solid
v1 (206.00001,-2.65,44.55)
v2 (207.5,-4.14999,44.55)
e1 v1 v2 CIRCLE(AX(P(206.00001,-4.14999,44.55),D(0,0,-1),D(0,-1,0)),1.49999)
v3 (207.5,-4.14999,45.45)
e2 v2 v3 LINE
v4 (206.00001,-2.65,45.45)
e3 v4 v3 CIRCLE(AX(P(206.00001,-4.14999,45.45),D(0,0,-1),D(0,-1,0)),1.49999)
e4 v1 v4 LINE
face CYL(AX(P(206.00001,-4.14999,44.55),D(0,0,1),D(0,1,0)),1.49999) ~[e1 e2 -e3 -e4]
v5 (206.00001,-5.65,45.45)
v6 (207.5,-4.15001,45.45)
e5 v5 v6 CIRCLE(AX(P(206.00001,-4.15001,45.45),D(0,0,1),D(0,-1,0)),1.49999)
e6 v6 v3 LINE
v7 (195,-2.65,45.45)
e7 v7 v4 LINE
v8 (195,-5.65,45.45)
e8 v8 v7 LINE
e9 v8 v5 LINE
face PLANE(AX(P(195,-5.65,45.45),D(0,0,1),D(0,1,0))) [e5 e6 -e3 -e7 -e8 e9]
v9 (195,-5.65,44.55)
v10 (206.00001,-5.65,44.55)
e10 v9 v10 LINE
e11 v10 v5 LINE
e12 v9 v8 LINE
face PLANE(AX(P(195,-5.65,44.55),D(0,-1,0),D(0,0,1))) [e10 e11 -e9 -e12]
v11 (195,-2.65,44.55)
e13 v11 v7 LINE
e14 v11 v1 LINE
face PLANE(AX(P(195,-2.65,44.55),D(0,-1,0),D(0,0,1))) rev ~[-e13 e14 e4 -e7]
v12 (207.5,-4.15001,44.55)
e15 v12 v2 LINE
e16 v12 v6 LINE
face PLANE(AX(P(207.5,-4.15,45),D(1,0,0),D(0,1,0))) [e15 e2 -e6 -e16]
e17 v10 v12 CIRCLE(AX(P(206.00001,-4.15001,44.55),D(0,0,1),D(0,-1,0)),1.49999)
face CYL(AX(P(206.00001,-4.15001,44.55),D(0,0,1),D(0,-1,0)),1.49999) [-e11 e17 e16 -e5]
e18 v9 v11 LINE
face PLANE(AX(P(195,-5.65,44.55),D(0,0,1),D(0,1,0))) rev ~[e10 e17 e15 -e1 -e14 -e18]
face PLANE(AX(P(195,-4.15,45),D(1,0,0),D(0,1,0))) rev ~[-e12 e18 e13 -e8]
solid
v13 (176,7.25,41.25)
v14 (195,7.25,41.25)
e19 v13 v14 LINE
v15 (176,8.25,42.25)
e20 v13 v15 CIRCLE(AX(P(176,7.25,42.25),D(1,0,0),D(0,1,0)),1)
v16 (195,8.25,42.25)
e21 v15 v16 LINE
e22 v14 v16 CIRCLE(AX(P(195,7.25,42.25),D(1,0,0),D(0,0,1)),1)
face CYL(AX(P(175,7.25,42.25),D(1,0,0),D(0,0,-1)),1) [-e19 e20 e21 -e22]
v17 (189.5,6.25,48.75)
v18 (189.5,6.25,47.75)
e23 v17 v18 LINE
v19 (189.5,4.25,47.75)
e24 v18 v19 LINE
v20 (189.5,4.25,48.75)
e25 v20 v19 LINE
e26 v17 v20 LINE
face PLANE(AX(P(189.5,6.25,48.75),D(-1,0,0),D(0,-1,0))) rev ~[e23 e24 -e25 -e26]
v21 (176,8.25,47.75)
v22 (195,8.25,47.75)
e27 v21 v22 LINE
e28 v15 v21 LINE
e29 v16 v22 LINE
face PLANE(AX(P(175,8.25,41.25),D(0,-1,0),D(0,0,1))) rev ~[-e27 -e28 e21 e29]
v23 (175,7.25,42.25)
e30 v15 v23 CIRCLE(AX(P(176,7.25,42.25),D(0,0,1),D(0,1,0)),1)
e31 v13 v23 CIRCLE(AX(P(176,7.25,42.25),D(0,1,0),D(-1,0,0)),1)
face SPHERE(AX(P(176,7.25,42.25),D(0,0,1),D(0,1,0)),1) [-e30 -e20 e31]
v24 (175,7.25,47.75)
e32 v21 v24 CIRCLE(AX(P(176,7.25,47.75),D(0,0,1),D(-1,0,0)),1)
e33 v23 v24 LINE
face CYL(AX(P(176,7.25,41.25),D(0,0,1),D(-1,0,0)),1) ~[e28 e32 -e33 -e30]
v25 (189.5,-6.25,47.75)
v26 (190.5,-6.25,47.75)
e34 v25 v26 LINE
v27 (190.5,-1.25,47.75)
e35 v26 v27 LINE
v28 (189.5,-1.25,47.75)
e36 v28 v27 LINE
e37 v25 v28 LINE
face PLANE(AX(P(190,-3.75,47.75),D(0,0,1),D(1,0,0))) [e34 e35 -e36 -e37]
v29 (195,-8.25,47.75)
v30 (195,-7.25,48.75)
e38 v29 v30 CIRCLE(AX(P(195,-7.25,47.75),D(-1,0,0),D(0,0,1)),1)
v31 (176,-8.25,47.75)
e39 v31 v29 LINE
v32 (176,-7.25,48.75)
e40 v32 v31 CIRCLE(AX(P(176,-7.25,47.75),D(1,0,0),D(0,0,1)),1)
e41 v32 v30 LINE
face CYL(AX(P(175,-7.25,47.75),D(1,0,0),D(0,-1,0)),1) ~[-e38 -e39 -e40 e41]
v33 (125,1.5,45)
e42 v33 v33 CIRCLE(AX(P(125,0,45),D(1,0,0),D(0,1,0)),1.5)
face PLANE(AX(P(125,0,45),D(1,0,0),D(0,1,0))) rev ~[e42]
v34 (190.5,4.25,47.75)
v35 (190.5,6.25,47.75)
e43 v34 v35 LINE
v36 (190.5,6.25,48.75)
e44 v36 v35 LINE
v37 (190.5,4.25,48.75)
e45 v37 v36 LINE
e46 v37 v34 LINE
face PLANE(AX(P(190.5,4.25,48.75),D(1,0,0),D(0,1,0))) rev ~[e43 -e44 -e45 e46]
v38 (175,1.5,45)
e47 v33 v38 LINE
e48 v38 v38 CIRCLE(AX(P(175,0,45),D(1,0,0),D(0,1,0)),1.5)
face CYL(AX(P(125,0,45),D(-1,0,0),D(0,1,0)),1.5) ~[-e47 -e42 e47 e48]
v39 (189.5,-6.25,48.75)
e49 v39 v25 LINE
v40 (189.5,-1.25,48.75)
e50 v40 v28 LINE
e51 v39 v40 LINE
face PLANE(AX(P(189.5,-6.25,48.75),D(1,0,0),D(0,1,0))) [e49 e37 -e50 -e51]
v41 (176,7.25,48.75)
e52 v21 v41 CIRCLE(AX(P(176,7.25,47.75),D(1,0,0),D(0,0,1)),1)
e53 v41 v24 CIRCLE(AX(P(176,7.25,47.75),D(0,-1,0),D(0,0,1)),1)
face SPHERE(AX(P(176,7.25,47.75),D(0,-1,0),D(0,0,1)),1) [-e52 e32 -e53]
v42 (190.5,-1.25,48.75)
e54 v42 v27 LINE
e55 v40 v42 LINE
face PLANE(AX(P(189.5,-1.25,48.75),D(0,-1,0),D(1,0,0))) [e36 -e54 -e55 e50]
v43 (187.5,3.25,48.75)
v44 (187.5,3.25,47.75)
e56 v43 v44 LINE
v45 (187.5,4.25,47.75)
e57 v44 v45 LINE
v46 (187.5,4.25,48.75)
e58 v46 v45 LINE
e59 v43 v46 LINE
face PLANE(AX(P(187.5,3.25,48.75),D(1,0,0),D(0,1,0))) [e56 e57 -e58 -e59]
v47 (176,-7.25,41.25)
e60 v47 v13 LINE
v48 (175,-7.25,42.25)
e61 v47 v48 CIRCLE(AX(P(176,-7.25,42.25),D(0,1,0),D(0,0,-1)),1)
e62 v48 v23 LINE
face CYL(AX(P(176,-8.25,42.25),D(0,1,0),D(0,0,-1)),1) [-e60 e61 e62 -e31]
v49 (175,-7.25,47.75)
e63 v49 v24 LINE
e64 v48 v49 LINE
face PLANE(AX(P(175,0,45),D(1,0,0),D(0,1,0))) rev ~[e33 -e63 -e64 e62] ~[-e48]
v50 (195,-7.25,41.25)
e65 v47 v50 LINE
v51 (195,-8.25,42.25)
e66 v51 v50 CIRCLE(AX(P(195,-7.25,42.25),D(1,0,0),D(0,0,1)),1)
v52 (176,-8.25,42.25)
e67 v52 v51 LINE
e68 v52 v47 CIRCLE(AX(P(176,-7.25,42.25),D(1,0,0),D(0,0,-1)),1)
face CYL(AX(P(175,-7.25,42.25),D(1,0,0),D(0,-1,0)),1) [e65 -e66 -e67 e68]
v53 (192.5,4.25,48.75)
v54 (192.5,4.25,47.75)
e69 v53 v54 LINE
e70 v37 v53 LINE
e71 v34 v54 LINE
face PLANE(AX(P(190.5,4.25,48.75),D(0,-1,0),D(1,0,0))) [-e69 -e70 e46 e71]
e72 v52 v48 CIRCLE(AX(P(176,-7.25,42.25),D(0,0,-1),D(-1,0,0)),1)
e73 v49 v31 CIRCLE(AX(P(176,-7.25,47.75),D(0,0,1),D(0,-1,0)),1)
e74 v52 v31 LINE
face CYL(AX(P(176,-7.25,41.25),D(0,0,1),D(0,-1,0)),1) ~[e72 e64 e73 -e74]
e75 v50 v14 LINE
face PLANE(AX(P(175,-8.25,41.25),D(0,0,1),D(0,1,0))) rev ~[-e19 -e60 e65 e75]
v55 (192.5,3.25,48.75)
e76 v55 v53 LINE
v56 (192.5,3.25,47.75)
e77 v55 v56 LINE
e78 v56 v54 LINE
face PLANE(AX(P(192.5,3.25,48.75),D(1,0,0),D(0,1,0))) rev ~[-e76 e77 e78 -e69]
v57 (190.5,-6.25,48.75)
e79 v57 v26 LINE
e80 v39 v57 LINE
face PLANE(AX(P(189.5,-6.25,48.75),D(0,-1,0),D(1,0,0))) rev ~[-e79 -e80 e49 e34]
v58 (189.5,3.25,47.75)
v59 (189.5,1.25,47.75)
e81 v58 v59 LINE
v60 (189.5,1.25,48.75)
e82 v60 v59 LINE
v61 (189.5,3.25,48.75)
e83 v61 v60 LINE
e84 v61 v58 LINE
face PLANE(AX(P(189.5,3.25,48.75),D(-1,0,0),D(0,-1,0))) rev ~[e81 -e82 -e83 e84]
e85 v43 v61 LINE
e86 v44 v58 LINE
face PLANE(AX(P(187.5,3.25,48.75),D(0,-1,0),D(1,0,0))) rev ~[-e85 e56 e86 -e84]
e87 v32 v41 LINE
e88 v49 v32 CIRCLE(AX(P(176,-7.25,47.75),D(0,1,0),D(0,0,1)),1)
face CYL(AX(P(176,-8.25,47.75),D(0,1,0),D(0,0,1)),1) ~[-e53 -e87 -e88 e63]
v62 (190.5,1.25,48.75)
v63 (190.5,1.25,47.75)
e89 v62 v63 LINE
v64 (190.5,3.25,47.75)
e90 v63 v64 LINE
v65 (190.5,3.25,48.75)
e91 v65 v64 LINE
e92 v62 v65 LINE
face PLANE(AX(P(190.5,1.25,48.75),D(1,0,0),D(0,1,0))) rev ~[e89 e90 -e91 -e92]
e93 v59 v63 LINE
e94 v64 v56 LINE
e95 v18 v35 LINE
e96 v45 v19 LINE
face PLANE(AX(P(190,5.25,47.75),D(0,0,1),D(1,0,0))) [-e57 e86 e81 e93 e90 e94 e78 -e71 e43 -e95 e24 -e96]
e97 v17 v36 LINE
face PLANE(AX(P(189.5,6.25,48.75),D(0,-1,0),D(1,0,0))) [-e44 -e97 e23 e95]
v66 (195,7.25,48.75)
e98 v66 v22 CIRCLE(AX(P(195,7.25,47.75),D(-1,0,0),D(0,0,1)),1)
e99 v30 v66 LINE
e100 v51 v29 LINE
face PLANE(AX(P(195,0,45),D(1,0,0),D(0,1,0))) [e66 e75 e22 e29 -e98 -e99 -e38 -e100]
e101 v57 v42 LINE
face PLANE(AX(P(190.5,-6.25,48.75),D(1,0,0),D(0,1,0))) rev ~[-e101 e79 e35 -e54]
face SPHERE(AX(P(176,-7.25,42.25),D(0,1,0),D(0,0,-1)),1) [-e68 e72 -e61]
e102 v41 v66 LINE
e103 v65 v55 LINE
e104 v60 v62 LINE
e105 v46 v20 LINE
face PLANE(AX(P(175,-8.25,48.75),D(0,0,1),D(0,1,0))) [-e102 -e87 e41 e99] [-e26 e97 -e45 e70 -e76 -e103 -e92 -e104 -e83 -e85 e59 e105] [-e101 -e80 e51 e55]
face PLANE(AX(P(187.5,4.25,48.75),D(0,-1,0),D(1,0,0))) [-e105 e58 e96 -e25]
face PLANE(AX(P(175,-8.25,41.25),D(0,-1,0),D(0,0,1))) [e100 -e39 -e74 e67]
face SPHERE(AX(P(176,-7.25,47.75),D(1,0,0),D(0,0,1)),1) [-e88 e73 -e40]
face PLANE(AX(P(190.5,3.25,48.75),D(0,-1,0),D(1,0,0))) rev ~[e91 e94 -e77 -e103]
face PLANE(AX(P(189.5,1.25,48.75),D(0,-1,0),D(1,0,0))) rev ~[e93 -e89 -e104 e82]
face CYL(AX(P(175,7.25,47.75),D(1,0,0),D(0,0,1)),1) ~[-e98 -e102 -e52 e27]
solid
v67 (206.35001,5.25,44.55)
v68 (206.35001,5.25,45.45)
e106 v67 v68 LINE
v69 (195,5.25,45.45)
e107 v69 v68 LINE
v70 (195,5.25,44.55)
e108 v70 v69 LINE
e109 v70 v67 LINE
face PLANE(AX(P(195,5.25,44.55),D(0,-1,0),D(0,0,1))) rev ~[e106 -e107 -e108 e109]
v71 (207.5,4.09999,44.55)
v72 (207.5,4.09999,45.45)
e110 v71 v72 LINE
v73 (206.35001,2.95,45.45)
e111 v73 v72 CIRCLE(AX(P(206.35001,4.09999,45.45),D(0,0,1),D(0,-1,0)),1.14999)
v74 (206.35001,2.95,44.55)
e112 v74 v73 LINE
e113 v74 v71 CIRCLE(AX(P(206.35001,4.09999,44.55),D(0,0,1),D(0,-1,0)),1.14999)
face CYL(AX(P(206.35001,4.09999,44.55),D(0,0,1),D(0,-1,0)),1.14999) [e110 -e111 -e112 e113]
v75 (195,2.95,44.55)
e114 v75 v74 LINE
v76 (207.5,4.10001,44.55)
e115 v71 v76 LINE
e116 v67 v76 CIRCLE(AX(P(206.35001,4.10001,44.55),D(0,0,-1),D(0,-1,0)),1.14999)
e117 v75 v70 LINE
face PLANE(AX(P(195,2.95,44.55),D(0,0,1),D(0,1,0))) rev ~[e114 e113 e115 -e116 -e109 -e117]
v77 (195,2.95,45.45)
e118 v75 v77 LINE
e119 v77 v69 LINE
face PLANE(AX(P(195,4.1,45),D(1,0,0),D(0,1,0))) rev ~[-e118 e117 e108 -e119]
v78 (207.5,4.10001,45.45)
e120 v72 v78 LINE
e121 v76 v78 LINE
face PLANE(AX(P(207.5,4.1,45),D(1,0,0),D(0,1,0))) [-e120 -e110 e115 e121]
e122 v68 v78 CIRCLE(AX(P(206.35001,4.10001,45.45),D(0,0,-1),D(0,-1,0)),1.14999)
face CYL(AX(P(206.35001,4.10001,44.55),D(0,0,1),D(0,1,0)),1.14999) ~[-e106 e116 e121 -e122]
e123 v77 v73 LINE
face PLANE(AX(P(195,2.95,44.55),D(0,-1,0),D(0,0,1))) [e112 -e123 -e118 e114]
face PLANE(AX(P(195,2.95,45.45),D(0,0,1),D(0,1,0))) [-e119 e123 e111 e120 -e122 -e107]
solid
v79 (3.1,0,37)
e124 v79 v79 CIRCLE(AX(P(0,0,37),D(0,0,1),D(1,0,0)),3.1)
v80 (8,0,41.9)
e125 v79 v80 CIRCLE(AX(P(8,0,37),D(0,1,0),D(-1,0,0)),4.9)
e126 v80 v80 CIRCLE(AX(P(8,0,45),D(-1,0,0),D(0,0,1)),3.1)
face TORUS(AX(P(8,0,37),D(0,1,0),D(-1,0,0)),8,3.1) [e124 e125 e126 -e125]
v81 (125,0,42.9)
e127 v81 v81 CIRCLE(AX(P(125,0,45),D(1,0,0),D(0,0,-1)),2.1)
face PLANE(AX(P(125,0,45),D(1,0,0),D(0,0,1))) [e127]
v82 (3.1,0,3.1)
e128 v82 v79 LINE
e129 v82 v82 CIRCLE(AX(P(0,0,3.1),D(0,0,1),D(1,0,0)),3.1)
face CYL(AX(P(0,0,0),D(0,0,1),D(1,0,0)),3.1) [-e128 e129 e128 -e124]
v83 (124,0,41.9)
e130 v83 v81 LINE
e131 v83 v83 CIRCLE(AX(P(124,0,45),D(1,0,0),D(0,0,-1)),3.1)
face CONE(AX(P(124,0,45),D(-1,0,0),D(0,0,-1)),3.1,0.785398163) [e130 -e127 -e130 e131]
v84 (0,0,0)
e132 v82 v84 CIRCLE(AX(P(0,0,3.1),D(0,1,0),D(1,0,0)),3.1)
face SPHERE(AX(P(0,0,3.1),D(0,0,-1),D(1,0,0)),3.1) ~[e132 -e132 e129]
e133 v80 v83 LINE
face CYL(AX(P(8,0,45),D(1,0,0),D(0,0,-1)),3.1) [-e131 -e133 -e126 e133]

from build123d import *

# Parameters (mm, degrees)
F1_R      = 3.1
F3_R      = 3.1
F4_R      = 1.5
F5_DEPTH  = 50
F6_SIZE   = 1
F7_W      = 16.5
F7_H      = 7.5
F7_R      = 1.5
F8_DEPTH  = 20
F9_W      = 3
F9_H      = 0.9
F10_DEPTH = 12.5
F9_W_2    = 2.3
F11_R     = 1
F12_R     = 1.49999
F13_R     = 1.14999
F14_W     = 1
F14_H     = 5
F14_H_2   = 2
F14_W_2   = 2
F14_H_3   = 1
F15_DEPTH = 1


# Not quite as in the source:
# - a fillet or chamfer is up to 0.001 mm smaller than in the source, because OpenCascade refuses the exact size


with BuildPart() as f2:
    # F2: sweep along a path in F0
    with BuildLine(Plane.XZ) as f2_path:
        Line((0, 0), (0, 37))
        ThreePointArc((0, 37), (2.3431457505, 42.6568542495), (8, 45))
        Line((8, 45), (125, 45))
    # F1 (on Top) → F2 (sweep)
    with BuildSketch(Plane.XY):
        Circle(F1_R)
    sweep(path=f2_path.line)

    # F3
    f3_edges = [f2.edges().sort_by_distance(p)[0] for p in [
        (-3.1, 0, 0),
    ]]
    fillet(f3_edges, radius=F3_R)

    # F6
    f6_edges = [f2.edges().sort_by_distance(p)[0] for p in [
        (125, 0, 48.1),
    ]]
    chamfer(f6_edges, length=F6_SIZE)


with BuildPart() as f5:
    # F4 (on face) → F5 (new body)
    with BuildSketch(Plane.YZ.offset(125)):
        with Locations((0, 45)):
            Circle(F4_R)
    extrude(amount=F5_DEPTH)

    # F7 (on face) → F8 (join)
    with BuildSketch(Plane.YZ.offset(175)):
        with Locations((0, 45)):
            Rectangle(F7_W, F7_H)
        with Locations((0, 45)):
            Circle(F7_R, mode=Mode.SUBTRACT)
        with Locations((0, 45)):
            Circle(F7_R)
    extrude(amount=F8_DEPTH)

    # F11
    f11_edges = [f5.edges().sort_by_distance(p)[0] for p in [
        (185, -8.25, 48.75),
        (175, 0, 48.75),
        (185, 8.25, 48.75),
        (175, 8.25, 45),
        (185, 8.25, 41.25),
        (175, 0, 41.25),
        (185, -8.25, 41.25),
        (175, -8.25, 45),
    ]]
    fillet(f11_edges, radius=F11_R)

    # F14 (on face) → F15 (cut)
    with BuildSketch(Plane.XY.offset(48.75)):
        with Locations((190, -3.75)):
            Rectangle(F14_W, F14_H)
        with Locations((190, 5.25)):
            Rectangle(F14_W, F14_H_2)
        with Locations((191.5, 3.75)):
            Rectangle(F14_W_2, F14_H_3)
        with Locations((190, 3.75)):
            Rectangle(F14_W, F14_H_3)
        with Locations((190, 2.25)):
            Rectangle(F14_W, F14_H_2)
        with Locations((188.5, 3.75)):
            Rectangle(F14_W_2, F14_H_3)
    extrude(amount=-F15_DEPTH, mode=Mode.SUBTRACT)


with BuildPart() as f10:
    # F9 (on face) → F10 (new body)
    with BuildSketch(Plane.YZ.offset(195)):
        with Locations((-4.15, 45)):
            Rectangle(F9_W, F9_H)
    extrude(amount=F10_DEPTH)

    # F12 (radius 1.5 in the source; OpenCascade refuses exactly that, so slightly less here)
    f12_edges = [f10.edges().sort_by_distance(p)[0] for p in [
        (207.5, -2.65, 45),
        (207.5, -5.65, 45),
    ]]
    fillet(f12_edges, radius=F12_R)


with BuildPart() as f10b:
    # F9 (on face) → F10, piece 2 (new body)
    with BuildSketch(Plane.YZ.offset(195)):
        with Locations((4.1, 45)):
            Rectangle(F9_W_2, F9_H)
    extrude(amount=F10_DEPTH)

    # F13 (radius 1.15 in the source; OpenCascade refuses exactly that, so slightly less here)
    f13_edges = [f10b.edges().sort_by_distance(p)[0] for p in [
        (207.5, 5.25, 45),
        (207.5, 2.95, 45),
    ]]
    fillet(f13_edges, radius=F13_R)


solid = Compound([f2.part, f5.part, f10.part, f10b.part])
